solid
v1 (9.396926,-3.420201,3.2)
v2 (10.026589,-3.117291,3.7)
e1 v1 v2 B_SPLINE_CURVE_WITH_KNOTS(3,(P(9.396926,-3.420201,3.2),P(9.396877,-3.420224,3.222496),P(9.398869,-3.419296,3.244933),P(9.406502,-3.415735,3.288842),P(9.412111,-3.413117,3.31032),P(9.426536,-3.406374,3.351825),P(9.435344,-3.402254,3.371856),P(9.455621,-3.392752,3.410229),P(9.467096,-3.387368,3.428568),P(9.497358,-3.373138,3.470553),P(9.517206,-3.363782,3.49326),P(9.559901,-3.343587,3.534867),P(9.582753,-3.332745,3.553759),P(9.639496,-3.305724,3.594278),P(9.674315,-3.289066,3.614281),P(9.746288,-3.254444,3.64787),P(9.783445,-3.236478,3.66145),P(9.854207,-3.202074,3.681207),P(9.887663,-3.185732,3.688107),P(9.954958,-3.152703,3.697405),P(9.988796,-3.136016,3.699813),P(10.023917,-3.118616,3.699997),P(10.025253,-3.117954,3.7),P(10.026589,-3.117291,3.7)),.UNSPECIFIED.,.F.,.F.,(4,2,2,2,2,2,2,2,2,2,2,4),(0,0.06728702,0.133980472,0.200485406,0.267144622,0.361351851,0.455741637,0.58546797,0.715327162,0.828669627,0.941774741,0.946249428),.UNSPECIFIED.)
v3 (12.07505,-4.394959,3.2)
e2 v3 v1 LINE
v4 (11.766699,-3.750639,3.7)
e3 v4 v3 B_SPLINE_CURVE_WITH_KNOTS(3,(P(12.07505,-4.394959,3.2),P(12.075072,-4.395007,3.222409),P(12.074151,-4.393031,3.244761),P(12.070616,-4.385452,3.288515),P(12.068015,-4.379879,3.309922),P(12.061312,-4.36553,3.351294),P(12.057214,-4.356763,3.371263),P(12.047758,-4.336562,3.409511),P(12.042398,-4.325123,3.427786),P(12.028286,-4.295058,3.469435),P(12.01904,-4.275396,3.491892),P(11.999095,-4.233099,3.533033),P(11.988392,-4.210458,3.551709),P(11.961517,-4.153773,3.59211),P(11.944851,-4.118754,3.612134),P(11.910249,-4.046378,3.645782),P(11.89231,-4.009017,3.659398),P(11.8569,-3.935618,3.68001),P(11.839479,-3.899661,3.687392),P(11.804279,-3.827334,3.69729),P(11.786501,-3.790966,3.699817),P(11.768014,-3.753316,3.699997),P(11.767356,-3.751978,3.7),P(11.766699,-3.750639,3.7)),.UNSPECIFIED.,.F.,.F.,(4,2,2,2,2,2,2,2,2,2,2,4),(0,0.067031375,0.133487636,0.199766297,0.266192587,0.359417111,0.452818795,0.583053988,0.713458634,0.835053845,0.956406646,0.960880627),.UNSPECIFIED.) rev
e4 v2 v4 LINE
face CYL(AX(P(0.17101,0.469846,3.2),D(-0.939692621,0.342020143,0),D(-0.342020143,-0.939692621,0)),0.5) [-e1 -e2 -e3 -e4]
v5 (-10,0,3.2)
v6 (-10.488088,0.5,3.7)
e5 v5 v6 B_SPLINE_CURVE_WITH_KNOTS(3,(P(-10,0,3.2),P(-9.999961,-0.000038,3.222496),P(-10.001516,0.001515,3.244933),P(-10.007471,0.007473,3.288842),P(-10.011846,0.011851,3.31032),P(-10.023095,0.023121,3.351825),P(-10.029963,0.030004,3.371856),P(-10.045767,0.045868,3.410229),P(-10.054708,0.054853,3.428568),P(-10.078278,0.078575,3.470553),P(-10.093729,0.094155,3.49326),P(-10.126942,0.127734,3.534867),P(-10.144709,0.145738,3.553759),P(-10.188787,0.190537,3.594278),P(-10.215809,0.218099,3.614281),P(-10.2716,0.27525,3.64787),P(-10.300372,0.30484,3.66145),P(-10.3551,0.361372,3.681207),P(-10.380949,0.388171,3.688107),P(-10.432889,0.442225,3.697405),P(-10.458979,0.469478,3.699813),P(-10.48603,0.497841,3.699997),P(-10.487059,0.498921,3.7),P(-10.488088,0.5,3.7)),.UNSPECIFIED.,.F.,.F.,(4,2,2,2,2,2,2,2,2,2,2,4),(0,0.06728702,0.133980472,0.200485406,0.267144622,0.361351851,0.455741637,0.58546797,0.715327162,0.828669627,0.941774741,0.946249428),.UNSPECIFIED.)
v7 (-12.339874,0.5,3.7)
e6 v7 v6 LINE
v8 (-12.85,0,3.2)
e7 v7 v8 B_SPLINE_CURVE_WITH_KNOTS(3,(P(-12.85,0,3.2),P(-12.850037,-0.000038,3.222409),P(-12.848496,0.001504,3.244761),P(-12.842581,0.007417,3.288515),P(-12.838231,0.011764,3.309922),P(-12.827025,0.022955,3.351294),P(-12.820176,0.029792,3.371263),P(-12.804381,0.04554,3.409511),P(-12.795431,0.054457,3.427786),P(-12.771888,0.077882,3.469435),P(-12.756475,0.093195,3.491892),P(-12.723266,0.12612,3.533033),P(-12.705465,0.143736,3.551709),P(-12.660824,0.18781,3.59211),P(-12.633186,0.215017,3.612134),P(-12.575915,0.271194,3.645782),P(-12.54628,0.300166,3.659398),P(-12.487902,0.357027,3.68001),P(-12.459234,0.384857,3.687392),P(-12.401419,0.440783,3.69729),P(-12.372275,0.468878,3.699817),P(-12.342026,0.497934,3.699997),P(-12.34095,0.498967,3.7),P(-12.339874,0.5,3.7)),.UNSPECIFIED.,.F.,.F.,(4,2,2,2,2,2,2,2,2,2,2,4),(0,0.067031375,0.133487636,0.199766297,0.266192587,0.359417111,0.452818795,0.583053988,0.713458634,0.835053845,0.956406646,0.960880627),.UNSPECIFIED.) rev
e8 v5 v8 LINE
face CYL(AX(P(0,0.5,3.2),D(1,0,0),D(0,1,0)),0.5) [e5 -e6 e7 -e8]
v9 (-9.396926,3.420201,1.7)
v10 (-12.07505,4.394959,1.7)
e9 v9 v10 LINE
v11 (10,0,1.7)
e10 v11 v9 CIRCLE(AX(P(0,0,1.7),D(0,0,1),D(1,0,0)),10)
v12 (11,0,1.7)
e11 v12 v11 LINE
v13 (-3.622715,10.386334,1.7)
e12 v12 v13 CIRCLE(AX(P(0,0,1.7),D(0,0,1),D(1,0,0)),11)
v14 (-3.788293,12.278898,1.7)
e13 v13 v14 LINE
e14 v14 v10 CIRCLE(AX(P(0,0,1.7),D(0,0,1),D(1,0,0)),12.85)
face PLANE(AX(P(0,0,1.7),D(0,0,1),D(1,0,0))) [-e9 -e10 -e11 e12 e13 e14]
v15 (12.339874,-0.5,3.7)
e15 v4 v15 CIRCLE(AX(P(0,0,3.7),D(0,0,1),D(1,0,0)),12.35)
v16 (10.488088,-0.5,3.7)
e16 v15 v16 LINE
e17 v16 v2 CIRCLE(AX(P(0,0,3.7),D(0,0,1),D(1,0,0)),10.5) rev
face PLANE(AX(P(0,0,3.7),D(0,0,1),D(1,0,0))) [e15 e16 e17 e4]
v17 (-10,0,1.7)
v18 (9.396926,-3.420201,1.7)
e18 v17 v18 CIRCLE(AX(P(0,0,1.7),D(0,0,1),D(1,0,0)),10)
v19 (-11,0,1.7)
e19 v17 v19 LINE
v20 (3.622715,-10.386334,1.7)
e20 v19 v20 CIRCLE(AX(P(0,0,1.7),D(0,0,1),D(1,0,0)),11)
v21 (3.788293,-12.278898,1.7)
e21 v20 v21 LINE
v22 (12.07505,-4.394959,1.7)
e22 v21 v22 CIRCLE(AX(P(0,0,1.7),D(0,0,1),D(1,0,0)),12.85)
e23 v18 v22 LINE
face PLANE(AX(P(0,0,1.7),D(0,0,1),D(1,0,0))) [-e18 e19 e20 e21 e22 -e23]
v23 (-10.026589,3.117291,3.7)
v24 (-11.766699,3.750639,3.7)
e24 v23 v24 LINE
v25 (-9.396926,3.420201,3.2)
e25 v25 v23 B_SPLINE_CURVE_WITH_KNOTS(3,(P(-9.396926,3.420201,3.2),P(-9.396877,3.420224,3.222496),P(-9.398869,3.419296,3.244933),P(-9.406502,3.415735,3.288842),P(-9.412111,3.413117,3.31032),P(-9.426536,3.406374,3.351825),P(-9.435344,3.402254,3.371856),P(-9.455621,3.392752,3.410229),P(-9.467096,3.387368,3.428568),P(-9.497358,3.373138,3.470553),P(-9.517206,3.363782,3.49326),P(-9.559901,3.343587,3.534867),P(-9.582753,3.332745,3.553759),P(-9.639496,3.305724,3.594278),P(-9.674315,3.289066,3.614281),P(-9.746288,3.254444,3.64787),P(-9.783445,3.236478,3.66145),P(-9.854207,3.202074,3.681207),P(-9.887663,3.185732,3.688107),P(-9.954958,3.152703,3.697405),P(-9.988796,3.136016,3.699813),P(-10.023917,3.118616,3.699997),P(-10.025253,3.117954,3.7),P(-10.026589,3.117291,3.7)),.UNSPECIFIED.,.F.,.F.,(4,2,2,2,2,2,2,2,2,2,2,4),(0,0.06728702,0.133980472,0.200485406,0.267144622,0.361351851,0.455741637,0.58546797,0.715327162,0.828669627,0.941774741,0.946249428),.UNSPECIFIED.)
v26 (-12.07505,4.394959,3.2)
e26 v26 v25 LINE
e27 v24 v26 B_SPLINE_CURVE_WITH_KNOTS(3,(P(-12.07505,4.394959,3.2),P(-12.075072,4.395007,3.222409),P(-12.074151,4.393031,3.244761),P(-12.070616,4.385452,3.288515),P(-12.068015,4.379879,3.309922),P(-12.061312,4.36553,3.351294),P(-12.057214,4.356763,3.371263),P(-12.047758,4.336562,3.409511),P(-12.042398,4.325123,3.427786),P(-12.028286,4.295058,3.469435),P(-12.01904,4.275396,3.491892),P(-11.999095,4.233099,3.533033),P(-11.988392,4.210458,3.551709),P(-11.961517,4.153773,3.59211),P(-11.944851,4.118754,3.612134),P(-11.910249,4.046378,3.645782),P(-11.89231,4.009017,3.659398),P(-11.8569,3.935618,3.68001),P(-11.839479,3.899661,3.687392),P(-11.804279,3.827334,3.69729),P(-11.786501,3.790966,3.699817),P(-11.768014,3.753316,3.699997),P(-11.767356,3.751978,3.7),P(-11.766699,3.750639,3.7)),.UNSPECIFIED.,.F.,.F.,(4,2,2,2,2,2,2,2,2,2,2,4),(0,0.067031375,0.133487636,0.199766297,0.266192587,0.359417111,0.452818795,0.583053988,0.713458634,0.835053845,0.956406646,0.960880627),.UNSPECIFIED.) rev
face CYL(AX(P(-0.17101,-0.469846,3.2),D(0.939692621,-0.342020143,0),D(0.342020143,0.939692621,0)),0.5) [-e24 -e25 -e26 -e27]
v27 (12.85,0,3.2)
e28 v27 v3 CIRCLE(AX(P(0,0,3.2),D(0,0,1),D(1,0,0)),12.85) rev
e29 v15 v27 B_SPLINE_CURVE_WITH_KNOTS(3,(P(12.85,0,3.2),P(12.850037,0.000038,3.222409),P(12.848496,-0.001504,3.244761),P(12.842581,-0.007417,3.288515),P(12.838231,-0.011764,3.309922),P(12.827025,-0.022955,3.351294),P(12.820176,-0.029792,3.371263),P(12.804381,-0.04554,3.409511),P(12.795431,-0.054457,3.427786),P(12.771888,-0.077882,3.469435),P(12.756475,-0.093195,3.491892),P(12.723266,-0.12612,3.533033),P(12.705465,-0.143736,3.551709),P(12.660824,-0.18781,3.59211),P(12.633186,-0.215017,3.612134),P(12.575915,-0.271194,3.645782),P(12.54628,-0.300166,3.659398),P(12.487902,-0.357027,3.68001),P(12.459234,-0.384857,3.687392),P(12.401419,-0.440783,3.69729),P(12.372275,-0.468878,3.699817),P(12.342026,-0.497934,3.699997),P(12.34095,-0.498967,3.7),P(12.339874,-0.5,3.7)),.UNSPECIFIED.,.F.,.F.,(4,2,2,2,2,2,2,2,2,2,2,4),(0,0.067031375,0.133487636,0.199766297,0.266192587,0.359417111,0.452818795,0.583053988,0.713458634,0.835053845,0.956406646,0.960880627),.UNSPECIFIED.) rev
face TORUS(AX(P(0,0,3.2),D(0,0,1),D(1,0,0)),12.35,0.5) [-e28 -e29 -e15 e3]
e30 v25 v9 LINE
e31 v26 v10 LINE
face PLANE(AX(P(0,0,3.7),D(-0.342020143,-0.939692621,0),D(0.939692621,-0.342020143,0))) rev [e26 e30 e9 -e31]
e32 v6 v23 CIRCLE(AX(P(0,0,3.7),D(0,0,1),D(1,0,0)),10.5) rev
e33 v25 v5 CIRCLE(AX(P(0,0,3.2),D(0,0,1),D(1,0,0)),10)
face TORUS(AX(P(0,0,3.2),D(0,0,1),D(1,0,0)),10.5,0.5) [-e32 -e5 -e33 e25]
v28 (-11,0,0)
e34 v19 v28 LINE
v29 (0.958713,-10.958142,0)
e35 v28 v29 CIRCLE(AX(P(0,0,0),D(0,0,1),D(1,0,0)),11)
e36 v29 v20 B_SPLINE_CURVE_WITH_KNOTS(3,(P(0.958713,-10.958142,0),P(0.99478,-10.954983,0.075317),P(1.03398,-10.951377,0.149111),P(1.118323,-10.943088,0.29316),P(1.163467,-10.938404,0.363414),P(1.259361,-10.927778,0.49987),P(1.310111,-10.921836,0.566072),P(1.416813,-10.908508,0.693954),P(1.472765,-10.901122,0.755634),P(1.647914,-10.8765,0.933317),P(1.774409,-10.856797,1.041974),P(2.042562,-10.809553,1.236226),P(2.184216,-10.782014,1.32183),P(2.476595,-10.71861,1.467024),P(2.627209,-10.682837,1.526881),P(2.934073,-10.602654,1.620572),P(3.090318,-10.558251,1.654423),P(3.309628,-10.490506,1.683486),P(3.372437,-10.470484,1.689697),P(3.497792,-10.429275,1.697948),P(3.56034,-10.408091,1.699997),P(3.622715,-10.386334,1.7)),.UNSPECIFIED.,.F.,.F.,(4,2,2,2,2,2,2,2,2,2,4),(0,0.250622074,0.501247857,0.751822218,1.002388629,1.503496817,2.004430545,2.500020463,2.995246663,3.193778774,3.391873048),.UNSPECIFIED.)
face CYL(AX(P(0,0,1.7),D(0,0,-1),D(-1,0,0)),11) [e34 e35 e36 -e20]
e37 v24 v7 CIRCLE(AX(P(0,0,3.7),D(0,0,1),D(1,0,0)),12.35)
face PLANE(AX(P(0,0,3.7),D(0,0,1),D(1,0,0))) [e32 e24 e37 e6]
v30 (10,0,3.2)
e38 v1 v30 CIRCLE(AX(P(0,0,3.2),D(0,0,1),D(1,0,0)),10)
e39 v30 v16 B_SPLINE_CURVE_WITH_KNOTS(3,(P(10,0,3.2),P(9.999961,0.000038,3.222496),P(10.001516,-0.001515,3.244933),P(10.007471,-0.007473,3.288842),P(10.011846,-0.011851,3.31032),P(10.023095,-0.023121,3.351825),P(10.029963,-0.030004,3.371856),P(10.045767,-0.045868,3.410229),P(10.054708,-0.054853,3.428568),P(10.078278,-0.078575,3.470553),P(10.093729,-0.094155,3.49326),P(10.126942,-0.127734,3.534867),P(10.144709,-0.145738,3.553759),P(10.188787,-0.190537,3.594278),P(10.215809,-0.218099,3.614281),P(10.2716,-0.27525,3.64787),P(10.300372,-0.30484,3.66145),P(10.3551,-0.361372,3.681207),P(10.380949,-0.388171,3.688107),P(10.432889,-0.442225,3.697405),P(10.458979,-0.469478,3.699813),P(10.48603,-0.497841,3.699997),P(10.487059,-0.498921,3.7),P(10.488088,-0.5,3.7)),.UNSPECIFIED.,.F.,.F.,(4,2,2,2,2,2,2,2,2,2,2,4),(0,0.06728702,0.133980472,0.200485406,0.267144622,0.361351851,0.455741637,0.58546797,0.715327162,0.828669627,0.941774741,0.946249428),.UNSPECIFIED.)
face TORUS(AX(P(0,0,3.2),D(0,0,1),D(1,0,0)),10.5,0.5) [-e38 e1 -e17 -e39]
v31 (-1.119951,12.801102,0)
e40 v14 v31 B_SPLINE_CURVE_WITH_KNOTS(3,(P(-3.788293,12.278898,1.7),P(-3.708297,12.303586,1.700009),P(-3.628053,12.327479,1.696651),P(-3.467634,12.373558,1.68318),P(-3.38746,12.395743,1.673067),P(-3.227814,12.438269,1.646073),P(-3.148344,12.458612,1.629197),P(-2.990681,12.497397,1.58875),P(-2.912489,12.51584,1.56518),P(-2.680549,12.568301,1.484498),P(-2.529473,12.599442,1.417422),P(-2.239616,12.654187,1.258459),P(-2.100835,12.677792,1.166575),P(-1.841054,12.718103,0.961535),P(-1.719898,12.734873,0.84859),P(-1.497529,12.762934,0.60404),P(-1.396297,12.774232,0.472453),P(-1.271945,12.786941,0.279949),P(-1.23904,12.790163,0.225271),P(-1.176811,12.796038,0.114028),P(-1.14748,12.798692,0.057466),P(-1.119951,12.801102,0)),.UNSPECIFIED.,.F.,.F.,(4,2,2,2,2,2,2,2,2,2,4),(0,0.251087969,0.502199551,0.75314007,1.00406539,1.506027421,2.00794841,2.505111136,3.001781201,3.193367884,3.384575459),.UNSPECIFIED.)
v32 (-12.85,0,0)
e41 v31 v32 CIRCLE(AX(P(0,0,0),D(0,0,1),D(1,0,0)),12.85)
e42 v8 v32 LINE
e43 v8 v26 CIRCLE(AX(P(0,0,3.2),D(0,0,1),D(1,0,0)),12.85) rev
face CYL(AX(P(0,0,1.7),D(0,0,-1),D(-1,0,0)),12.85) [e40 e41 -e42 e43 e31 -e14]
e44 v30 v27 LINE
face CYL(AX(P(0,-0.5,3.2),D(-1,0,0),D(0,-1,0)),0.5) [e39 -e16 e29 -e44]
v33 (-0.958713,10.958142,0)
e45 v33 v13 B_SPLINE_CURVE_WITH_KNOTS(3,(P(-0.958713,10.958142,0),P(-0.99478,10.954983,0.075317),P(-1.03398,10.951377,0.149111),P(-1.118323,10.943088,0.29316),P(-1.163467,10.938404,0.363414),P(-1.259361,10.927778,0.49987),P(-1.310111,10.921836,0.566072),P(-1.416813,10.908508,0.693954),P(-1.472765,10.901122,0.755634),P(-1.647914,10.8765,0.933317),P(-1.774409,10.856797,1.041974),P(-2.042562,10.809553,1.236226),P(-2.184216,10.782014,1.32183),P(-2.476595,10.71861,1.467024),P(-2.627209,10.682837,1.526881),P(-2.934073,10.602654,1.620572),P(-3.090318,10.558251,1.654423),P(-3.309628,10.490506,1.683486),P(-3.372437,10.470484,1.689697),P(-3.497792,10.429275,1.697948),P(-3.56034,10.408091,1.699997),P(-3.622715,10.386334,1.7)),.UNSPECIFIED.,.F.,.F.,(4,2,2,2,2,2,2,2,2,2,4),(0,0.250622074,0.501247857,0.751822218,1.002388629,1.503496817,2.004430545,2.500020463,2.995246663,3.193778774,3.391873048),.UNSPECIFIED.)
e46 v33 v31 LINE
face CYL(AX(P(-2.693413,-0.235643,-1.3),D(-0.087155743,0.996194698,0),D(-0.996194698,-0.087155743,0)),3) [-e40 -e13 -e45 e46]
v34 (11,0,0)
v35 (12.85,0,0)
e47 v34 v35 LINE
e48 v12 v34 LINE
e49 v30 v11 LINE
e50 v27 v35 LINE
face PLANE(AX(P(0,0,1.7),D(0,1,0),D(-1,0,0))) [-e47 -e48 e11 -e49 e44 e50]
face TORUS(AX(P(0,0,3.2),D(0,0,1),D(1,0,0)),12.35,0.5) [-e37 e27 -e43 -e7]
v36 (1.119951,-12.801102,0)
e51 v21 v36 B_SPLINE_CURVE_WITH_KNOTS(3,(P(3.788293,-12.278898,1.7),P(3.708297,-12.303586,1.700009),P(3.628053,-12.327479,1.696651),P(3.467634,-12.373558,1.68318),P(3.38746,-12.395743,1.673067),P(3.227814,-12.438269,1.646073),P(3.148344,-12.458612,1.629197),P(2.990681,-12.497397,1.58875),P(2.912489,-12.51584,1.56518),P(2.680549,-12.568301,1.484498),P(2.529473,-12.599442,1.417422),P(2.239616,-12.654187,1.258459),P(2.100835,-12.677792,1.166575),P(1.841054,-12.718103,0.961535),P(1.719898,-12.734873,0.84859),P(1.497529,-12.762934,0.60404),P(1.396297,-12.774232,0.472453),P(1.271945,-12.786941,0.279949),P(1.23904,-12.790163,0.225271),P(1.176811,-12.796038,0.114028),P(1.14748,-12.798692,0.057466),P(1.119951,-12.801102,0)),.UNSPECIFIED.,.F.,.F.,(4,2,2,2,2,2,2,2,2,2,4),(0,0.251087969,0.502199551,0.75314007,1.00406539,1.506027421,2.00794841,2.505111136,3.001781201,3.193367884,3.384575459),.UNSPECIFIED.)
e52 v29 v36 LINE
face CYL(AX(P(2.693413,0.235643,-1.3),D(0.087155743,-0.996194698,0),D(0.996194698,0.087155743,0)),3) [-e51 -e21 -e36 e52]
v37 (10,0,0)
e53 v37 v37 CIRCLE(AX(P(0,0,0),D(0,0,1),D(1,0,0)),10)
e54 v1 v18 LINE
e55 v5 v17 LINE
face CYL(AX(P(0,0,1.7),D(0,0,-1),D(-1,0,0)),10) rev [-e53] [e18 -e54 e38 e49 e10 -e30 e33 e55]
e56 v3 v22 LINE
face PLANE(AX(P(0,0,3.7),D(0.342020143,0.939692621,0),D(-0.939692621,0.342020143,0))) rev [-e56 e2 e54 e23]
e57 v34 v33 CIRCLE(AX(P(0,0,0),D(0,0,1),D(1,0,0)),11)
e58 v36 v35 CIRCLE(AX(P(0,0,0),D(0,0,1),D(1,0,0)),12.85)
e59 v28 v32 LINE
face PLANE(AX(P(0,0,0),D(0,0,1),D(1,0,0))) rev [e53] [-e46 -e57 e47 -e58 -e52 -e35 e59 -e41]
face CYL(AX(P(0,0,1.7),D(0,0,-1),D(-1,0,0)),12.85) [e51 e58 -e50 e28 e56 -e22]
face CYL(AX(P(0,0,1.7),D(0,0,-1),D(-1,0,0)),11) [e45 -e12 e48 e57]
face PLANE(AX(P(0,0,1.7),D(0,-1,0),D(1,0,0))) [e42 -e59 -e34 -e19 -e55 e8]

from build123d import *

# Parameters (mm, degrees)
BOSS_EXTRUDE1_DEPTH = 1.7
FILLET1_R           = 3
BOSS_EXTRUDE2_DEPTH = 2
FILLET2_R           = 0.5


with BuildPart() as part:
    # Sketch1 → Boss-Extrude1 (new body)
    with BuildSketch(Plane.XY):
        with BuildLine():
            ThreePointArc((-11, 0), (-8.110050705, 7.431492284), (-0.95871317, 10.958141679))
            Line((-0.95871317, 10.958141679), (-1.119951294, 12.80110187))
            ThreePointArc((-1.119951294, 12.80110187), (-9.474013778, 8.681334168), (-12.85, 0))
            Line((-12.85, 0), (-11, 0))
        make_face()
        with BuildLine():
            ThreePointArc((-10, 0), (-7.372773368, 6.755902076), (-0.871557427, 9.961946981))
            Line((-0.871557427, 9.961946981), (-0.95871317, 10.958141679))
            ThreePointArc((-0.95871317, 10.958141679), (-8.110050705, 7.431492284), (-11, 0))
            Line((-11, 0), (-10, 0))
        make_face()
        with BuildLine():
            Line((-0.95871317, 10.958141679), (-0.871557427, 9.961946981))
            ThreePointArc((-0.871557427, 9.961946981), (6.755902076, 7.372773368), (10, 0))
            Line((10, 0), (11, 0))
            ThreePointArc((11, 0), (7.431492284, 8.110050705), (-0.95871317, 10.958141679))
        make_face()
        with BuildLine():
            ThreePointArc((10, 0), (7.372773368, -6.755902076), (0.871557427, -9.961946981))
            Line((0.871557427, -9.961946981), (0.95871317, -10.958141679))
            ThreePointArc((0.95871317, -10.958141679), (8.110050705, -7.431492284), (11, 0))
            Line((11, 0), (10, 0))
        make_face()
        with BuildLine():
            Line((0.95871317, -10.958141679), (0.871557427, -9.961946981))
            ThreePointArc((0.871557427, -9.961946981), (-6.755902076, -7.372773368), (-10, 0))
            Line((-10, 0), (-11, 0))
            ThreePointArc((-11, 0), (-7.431492284, -8.110050705), (0.95871317, -10.958141679))
        make_face()
        with BuildLine():
            ThreePointArc((11, 0), (8.110050705, -7.431492284), (0.95871317, -10.958141679))
            Line((0.95871317, -10.958141679), (1.119951294, -12.80110187))
            ThreePointArc((1.119951294, -12.80110187), (9.474013778, -8.681334168), (12.85, 0))
            Line((12.85, 0), (11, 0))
        make_face()
    extrude(amount=BOSS_EXTRUDE1_DEPTH)

    # Fillet1
    # the kernel refuses this fillet: 3 mm, written as the material it takes off along each edge
    with BuildSketch(Plane(origin=(0.369605462, -4.22460976, 1.7), x_dir=(0.9961946980917454, 0.08715574274765832, 0), z_dir=(0.08715574274765833, -0.9961946980917455, 0))) as fillet1_piece_1_section:
        with BuildLine():
            CenterArc((2.703701167, -3), FILLET1_R, 90, 64.320711381)
            Line((0, -1.7), (0, 0))
            Line((0, 0), (2.703701167, 0))
        make_face()
    fillet1_piece_1 = extrude(amount=15.368505835, mode=Mode.PRIVATE)
    fillet1_piece_1 = fillet1_piece_1 - Plane(origin=(0, 0, 1.24476439), x_dir=(1, 0, 0), z_dir=(0, 0, -1)) * Cylinder(11, 42, mode=Mode.PRIVATE)
    add(fillet1_piece_1, mode=Mode.SUBTRACT)
    with BuildSketch(Plane(origin=(-1.709059003, 19.53463379, 1.7), x_dir=(0, 0, -1), z_dir=(0.08715574274761673, -0.9961946980917492, 0))) as fillet1_piece_2_section:
        with BuildLine():
            CenterArc((3, -2.703701167), FILLET1_R, 115.679288619, 64.320711381)
            Line((0, -2.703701167), (0, 0))
            Line((0, 0), (1.7, 0))
        make_face()
    fillet1_piece_2 = extrude(amount=15.368505835, mode=Mode.PRIVATE)
    fillet1_piece_2 = fillet1_piece_2 - Plane(origin=(0, 0, 1.24476439), x_dir=(1, 0, 0), z_dir=(0, 0, -1)) * Cylinder(11, 42, mode=Mode.PRIVATE)
    add(fillet1_piece_2, mode=Mode.SUBTRACT)

    # Sketch2 → Boss-Extrude2 (add)
    with BuildSketch(Plane.XY.offset(1.7)):
        with BuildLine():
            Line((-12.85, 0), (-11, 0))
            Line((-11, 0), (-10, 0))
            ThreePointArc((-10, 0), (-9.84807753, 1.736481777), (-9.396926208, 3.420201433))
            Line((-9.396926208, 3.420201433), (-12.075050177, 4.394958842))
            ThreePointArc((-12.075050177, 4.394958842), (-12.654779626, 2.231379083), (-12.85, 0))
        make_face()
        with BuildLine():
            ThreePointArc((10, 0), (9.84807753, -1.736481777), (9.396926208, -3.420201433))
            Line((9.396926208, -3.420201433), (12.075050177, -4.394958842))
            ThreePointArc((12.075050177, -4.394958842), (12.654779626, -2.231379083), (12.85, 0))
            Line((12.85, 0), (11, 0))
            Line((11, 0), (10, 0))
        make_face()
    extrude(amount=BOSS_EXTRUDE2_DEPTH)

    # Fillet2
    fillet2_edges = [part.edges().sort_by_distance(p)[0] for p in [
        (-9.84807753, 1.736481777, 3.7),
        (-10.735988192, 3.907580137, 3.7),
        (-12.654779626, 2.231379083, 3.7),
        (-11.425, 0, 3.7),
        (9.84807753, -1.736481777, 3.7),
        (10.735988192, -3.907580137, 3.7),
        (12.654779626, -2.231379083, 3.7),
        (11.425, 0, 3.7),
    ]]
    fillet(fillet2_edges, radius=FILLET2_R)


solid = part.part
